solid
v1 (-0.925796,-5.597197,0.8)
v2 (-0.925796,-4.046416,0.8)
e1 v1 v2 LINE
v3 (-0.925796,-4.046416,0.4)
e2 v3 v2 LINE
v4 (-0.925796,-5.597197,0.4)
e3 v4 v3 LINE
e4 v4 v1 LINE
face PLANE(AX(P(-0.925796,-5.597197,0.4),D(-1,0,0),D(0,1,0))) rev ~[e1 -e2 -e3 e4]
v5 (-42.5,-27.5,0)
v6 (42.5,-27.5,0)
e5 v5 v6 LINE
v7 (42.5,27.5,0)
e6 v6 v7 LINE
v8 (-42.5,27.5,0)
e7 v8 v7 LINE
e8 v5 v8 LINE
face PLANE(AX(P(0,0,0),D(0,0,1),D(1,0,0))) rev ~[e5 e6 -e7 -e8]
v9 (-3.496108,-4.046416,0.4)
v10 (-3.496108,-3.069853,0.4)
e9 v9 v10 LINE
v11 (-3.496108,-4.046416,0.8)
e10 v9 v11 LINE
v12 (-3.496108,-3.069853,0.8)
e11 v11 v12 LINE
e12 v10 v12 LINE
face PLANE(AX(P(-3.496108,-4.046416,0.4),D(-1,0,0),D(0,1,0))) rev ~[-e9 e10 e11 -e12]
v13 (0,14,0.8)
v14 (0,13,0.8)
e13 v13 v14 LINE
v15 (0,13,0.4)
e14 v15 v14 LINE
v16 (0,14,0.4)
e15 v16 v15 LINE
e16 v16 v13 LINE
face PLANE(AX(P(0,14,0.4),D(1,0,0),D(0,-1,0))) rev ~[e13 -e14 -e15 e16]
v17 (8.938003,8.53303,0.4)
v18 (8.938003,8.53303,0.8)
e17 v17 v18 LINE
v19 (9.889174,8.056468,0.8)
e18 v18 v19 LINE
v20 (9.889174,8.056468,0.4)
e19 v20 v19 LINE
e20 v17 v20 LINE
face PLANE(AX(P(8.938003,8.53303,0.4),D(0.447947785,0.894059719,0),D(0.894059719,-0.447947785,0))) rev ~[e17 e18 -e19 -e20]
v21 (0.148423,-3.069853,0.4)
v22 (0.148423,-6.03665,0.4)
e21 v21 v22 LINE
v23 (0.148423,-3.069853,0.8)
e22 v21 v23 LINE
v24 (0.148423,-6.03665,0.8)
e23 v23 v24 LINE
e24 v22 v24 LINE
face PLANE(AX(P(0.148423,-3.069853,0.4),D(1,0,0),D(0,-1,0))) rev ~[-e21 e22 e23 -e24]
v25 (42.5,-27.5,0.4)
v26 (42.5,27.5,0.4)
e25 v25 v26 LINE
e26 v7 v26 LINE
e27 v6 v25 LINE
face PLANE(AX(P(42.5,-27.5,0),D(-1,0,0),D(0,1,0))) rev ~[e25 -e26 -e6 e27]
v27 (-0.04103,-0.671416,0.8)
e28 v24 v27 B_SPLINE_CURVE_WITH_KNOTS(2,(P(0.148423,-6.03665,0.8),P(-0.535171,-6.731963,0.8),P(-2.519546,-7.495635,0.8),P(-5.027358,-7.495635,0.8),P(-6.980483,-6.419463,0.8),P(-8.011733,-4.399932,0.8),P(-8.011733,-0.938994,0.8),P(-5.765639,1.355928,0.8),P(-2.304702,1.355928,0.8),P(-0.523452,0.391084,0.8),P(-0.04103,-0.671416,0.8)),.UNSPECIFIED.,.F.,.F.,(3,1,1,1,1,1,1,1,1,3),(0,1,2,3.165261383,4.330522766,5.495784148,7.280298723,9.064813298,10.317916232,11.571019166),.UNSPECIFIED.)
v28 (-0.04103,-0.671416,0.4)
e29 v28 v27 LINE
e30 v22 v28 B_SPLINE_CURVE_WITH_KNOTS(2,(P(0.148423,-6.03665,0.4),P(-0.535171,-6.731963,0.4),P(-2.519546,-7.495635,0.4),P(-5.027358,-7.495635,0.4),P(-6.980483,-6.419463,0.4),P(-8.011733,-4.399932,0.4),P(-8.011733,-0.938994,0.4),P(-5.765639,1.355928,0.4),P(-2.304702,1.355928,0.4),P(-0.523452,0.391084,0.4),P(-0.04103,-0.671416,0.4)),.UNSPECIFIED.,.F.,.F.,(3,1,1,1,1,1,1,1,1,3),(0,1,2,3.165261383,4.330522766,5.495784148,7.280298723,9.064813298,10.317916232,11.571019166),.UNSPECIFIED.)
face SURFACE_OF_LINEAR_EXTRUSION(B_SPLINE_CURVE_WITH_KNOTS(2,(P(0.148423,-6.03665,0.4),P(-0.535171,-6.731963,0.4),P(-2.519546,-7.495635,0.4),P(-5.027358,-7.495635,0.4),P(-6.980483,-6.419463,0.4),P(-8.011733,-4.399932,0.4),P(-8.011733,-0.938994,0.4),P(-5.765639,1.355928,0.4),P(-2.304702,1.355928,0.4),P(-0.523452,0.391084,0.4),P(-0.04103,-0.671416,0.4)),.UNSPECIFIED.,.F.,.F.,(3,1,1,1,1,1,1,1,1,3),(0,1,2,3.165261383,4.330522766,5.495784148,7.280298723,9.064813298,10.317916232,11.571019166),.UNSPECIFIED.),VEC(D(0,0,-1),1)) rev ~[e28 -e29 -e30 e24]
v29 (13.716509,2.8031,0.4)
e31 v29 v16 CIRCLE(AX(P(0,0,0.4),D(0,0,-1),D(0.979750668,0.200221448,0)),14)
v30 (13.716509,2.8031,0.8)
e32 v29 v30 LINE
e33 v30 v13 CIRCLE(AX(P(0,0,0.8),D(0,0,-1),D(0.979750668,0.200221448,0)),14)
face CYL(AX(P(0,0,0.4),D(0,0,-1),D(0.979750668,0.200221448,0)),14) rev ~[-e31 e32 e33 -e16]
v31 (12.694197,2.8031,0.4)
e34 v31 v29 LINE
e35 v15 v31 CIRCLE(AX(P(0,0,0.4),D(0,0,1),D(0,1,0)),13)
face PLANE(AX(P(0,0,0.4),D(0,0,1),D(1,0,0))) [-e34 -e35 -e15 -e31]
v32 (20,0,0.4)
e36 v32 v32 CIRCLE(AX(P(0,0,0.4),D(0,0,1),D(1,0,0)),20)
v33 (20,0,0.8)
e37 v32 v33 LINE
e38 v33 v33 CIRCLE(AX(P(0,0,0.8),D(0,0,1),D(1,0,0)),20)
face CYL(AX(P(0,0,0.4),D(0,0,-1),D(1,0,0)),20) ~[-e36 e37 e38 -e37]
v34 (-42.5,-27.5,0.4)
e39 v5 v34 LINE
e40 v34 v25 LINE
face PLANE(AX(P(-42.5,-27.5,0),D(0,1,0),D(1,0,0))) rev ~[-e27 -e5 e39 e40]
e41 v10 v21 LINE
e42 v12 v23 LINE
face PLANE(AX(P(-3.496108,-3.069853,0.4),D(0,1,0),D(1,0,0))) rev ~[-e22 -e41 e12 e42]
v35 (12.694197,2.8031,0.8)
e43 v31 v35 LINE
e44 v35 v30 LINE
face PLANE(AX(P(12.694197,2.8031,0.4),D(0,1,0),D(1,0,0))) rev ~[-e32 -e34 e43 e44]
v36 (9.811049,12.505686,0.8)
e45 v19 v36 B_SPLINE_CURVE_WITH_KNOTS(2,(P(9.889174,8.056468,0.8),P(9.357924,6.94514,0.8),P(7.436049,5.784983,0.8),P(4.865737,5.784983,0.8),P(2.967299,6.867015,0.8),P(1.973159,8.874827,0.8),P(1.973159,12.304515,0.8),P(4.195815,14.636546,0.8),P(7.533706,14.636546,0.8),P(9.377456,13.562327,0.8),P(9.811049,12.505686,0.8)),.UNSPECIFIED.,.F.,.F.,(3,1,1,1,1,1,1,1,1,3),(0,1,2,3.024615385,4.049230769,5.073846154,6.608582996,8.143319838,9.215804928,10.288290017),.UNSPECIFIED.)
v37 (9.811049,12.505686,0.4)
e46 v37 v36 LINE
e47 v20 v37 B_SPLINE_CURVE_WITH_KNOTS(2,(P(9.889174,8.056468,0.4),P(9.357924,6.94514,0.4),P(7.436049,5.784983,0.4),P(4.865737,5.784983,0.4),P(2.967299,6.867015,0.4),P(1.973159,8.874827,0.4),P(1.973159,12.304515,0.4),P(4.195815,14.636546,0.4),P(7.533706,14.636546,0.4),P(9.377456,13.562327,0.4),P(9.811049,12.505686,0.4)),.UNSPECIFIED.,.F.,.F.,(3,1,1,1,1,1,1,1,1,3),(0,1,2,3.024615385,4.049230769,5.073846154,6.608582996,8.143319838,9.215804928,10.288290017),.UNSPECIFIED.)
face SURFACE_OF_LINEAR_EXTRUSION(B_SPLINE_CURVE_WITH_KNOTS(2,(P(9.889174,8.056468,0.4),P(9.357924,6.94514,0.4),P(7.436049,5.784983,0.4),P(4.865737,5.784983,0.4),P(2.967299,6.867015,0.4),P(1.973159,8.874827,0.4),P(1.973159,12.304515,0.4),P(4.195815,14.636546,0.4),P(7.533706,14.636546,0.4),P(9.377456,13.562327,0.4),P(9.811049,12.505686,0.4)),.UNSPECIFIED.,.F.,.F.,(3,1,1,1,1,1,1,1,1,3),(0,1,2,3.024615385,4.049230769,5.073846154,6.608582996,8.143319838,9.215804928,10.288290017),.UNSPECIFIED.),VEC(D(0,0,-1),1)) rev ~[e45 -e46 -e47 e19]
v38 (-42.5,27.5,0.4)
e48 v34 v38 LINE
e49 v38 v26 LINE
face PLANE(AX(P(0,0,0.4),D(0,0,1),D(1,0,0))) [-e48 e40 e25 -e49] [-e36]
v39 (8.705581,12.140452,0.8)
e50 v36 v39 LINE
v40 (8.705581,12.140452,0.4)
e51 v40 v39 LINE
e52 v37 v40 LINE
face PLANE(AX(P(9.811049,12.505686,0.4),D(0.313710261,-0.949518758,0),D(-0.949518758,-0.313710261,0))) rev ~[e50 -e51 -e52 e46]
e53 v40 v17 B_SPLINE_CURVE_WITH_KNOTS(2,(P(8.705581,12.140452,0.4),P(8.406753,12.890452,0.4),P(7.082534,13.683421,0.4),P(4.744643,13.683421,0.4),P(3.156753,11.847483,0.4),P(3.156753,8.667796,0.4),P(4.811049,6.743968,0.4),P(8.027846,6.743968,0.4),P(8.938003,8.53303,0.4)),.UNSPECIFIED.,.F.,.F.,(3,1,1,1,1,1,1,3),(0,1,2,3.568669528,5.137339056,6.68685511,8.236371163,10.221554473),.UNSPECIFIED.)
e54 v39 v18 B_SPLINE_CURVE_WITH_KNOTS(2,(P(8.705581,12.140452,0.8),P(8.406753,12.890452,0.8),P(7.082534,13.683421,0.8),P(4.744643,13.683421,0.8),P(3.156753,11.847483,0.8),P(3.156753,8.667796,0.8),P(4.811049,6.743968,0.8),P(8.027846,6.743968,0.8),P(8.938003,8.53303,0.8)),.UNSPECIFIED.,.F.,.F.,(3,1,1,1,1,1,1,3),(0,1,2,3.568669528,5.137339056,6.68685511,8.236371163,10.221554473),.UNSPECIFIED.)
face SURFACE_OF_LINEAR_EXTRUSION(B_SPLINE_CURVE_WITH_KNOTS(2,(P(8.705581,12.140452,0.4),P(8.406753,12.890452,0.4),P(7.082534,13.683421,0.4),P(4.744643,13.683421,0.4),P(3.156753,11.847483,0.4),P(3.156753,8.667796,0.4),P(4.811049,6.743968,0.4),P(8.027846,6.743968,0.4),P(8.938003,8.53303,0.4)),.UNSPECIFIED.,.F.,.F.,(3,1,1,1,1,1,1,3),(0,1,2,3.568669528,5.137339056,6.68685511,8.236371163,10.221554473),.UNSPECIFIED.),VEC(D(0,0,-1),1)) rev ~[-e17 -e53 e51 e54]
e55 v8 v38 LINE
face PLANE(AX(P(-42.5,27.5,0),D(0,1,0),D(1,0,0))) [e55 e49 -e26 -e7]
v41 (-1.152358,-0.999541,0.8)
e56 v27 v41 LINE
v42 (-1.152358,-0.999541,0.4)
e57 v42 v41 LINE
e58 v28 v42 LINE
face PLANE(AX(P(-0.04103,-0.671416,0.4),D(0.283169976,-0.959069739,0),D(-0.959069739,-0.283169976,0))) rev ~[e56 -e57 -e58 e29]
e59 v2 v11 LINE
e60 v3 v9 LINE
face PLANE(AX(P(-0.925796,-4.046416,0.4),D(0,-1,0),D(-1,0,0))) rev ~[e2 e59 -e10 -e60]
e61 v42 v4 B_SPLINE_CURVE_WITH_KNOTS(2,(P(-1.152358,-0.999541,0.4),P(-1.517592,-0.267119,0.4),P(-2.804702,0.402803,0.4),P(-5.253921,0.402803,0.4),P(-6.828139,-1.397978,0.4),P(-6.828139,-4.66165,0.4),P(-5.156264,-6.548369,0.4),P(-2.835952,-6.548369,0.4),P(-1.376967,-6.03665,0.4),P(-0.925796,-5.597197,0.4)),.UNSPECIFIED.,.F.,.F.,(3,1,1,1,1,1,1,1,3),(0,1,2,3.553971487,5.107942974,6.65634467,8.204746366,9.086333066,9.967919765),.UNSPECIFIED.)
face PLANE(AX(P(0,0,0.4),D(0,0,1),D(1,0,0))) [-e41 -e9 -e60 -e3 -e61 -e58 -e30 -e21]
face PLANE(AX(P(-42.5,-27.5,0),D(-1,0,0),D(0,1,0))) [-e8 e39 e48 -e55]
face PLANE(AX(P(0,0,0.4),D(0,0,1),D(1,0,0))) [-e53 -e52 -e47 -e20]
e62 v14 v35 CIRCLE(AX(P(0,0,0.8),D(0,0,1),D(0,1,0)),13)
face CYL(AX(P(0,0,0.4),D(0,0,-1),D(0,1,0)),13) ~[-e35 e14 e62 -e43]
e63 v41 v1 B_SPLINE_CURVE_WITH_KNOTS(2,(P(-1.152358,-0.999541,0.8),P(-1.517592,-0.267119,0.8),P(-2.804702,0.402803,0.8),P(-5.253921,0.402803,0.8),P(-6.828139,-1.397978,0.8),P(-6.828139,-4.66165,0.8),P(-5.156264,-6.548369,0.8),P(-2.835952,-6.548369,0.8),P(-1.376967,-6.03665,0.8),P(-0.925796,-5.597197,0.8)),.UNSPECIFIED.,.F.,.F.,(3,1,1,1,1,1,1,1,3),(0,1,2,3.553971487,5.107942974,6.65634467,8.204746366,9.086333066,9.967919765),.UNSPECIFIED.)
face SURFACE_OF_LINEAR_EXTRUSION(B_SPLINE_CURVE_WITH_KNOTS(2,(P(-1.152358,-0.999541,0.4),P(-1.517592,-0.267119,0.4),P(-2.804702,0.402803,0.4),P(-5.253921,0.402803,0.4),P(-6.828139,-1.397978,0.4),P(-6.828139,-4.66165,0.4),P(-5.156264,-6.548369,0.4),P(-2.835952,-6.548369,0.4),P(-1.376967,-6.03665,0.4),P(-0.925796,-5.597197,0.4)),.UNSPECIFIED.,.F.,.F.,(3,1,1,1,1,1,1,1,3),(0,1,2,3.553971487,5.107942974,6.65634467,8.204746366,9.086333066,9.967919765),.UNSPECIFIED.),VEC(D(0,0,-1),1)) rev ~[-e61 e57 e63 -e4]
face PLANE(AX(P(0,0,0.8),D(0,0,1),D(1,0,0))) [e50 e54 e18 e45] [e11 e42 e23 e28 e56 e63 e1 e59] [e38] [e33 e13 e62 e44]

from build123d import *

# Parameters (mm, degrees)
F0_W     = 85
F0_H     = 55
F1_DEPTH = 0.4
F2_R     = 20
F3_DEPTH = 0.4


with BuildPart() as f1:
    # F0 (on Top) → F1 (new body)
    with BuildSketch(Plane.XY):
        Rectangle(F0_W, F0_H)
    extrude(amount=F1_DEPTH)

    # F2 (on face) → F3 (join)
    with BuildSketch(Plane.XY.offset(0.4)):
        Circle(F2_R)
        with BuildLine():
            add(Edge.make_bspline(
                [(-7.4961080118, -5.409697216), (-8.0117330118, -4.399931591), (-8.0117330118, -3.032744091)],
                knots=[0, 0, 0, 1, 1, 1], degree=2))
            add(Edge.make_bspline(
                [(-8.0117330118, -3.032744091), (-8.0117330118, -0.938994091), (-6.8886861368, 0.2084668465)],
                knots=[0, 0, 0, 1, 1, 1], degree=2))
            add(Edge.make_bspline(
                [(-6.8886861368, 0.2084668465), (-5.7656392618, 1.355927784), (-3.7324361368, 1.355927784)],
                knots=[0, 0, 0, 1, 1, 1], degree=2))
            add(Edge.make_bspline(
                [(-3.7324361368, 1.355927784), (-2.3047017618, 1.355927784), (-1.4140767618, 0.873505909)],
                knots=[0, 0, 0, 1, 1, 1], degree=2))
            add(Edge.make_bspline(
                [(-1.4140767618, 0.873505909), (-0.5234517618, 0.391084034), (-0.0410298868, -0.671415966)],
                knots=[0, 0, 0, 1, 1, 1], degree=2))
            Line((-0.0410298868, -0.671415966), (-1.1523580118, -0.999540966))
            add(Edge.make_bspline(
                [(-1.1523580118, -0.999540966), (-1.5175923868, -0.267119091), (-2.1611470743, 0.0678418465)],
                knots=[0, 0, 0, 1, 1, 1], degree=2))
            add(Edge.make_bspline(
                [(-2.1611470743, 0.0678418465), (-2.8047017618, 0.402802784), (-3.7636861368, 0.402802784)],
                knots=[0, 0, 0, 1, 1, 1], degree=2))
            add(Edge.make_bspline(
                [(-3.7636861368, 0.402802784), (-5.2539205118, 0.402802784), (-6.0410298868, -0.497587841)],
                knots=[0, 0, 0, 1, 1, 1], degree=2))
            add(Edge.make_bspline(
                [(-6.0410298868, -0.497587841), (-6.8281392618, -1.397978466), (-6.8281392618, -3.032744091)],
                knots=[0, 0, 0, 1, 1, 1], degree=2))
            add(Edge.make_bspline(
                [(-6.8281392618, -3.032744091), (-6.8281392618, -4.661650341), (-5.9922017618, -5.605009716)],
                knots=[0, 0, 0, 1, 1, 1], degree=2))
            add(Edge.make_bspline(
                [(-5.9922017618, -5.605009716), (-5.1562642618, -6.548369091), (-3.6777486368, -6.548369091)],
                knots=[0, 0, 0, 1, 1, 1], degree=2))
            add(Edge.make_bspline(
                [(-3.6777486368, -6.548369091), (-2.8359517618, -6.548369091), (-2.1064595743, -6.292509716)],
                knots=[0, 0, 0, 1, 1, 1], degree=2))
            add(Edge.make_bspline(
                [(-2.1064595743, -6.292509716), (-1.3769673868, -6.036650341), (-0.9257955118, -5.597197216)],
                knots=[0, 0, 0, 1, 1, 1], degree=2))
            Line((-0.9257955118, -5.597197216), (-0.9257955118, -4.046415966))
            Line((-0.9257955118, -4.046415966), (-3.4961080118, -4.046415966))
            Line((-3.4961080118, -4.046415966), (-3.4961080118, -3.069853466))
            Line((-3.4961080118, -3.069853466), (0.1484232382, -3.069853466))
            Line((0.1484232382, -3.069853466), (0.1484232382, -6.036650341))
            add(Edge.make_bspline(
                [(0.1484232382, -6.036650341), (-0.5351705118, -6.731962841), (-1.5273580118, -7.1137987785)],
                knots=[0, 0, 0, 1, 1, 1], degree=2))
            add(Edge.make_bspline(
                [(-1.5273580118, -7.1137987785), (-2.5195455118, -7.495634716), (-3.6777486368, -7.495634716)],
                knots=[0, 0, 0, 1, 1, 1], degree=2))
            add(Edge.make_bspline(
                [(-3.6777486368, -7.495634716), (-5.0273580118, -7.495634716), (-6.0039205118, -6.9575487785)],
                knots=[0, 0, 0, 1, 1, 1], degree=2))
            add(Edge.make_bspline(
                [(-6.0039205118, -6.9575487785), (-6.9804830118, -6.419462841), (-7.4961080118, -5.409697216)],
                knots=[0, 0, 0, 1, 1, 1], degree=2))
        make_face(mode=Mode.SUBTRACT)
        with BuildLine():
            ThreePointArc((13.716509354, 2.803100273), (-8.8531518731, -10.845353932), (0, 14))
            Line((0, 14), (0, 13))
            ThreePointArc((0, 13), (-8.1412436535, -10.135095055), (12.6941966607, 2.803100273))
            Line((12.6941966607, 2.803100273), (13.716509354, 2.803100273))
        make_face(mode=Mode.SUBTRACT)
        with BuildLine():
            add(Edge.make_bspline(
                [(7.744643158, 13.2869364135), (7.082533783, 13.6834207885), (6.172377533, 13.6834207885)],
                knots=[0, 0, 0, 1, 1, 1], degree=2))
            add(Edge.make_bspline(
                [(6.172377533, 13.6834207885), (4.744643158, 13.6834207885), (3.9506978455, 12.7654520385)],
                knots=[0, 0, 0, 1, 1, 1], degree=2))
            add(Edge.make_bspline(
                [(3.9506978455, 12.7654520385), (3.156752533, 11.8474832885), (3.156752533, 10.2478739135)],
                knots=[0, 0, 0, 1, 1, 1], degree=2))
            add(Edge.make_bspline(
                [(3.156752533, 10.2478739135), (3.156752533, 8.6677957885), (3.9839009705, 7.705881726)],
                knots=[0, 0, 0, 1, 1, 1], degree=2))
            add(Edge.make_bspline(
                [(3.9839009705, 7.705881726), (4.811049408, 6.7439676635), (6.221205658, 6.7439676635)],
                knots=[0, 0, 0, 1, 1, 1], degree=2))
            add(Edge.make_bspline(
                [(6.221205658, 6.7439676635), (8.027846283, 6.7439676635), (8.938002533, 8.5330301635)],
                knots=[0, 0, 0, 1, 1, 1], degree=2))
            Line((8.938002533, 8.5330301635), (9.889174408, 8.0564676635))
            add(Edge.make_bspline(
                [(9.889174408, 8.0564676635), (9.357924408, 6.9451395385), (8.396986908, 6.3650614135)],
                knots=[0, 0, 0, 1, 1, 1], degree=2))
            add(Edge.make_bspline(
                [(8.396986908, 6.3650614135), (7.436049408, 5.7849832885), (6.166518158, 5.7849832885)],
                knots=[0, 0, 0, 1, 1, 1], degree=2))
            add(Edge.make_bspline(
                [(6.166518158, 5.7849832885), (4.865736908, 5.7849832885), (3.916518158, 6.3259989135)],
                knots=[0, 0, 0, 1, 1, 1], degree=2))
            add(Edge.make_bspline(
                [(3.916518158, 6.3259989135), (2.967299408, 6.8670145385), (2.4702290955, 7.8709207885)],
                knots=[0, 0, 0, 1, 1, 1], degree=2))
            add(Edge.make_bspline(
                [(2.4702290955, 7.8709207885), (1.973158783, 8.8748270385), (1.973158783, 10.2478739135)],
                knots=[0, 0, 0, 1, 1, 1], degree=2))
            add(Edge.make_bspline(
                [(1.973158783, 10.2478739135), (1.973158783, 12.3045145385), (3.084486908, 13.4705301635)],
                knots=[0, 0, 0, 1, 1, 1], degree=2))
            add(Edge.make_bspline(
                [(3.084486908, 13.4705301635), (4.195815033, 14.6365457885), (6.160658783, 14.6365457885)],
                knots=[0, 0, 0, 1, 1, 1], degree=2))
            add(Edge.make_bspline(
                [(6.160658783, 14.6365457885), (7.533705658, 14.6365457885), (8.455580658, 14.0994364135)],
                knots=[0, 0, 0, 1, 1, 1], degree=2))
            add(Edge.make_bspline(
                [(8.455580658, 14.0994364135), (9.377455658, 13.5623270385), (9.811049408, 12.5056864135)],
                knots=[0, 0, 0, 1, 1, 1], degree=2))
            Line((9.811049408, 12.5056864135), (8.705580658, 12.1404520385))
            add(Edge.make_bspline(
                [(8.705580658, 12.1404520385), (8.406752533, 12.8904520385), (7.744643158, 13.2869364135)],
                knots=[0, 0, 0, 1, 1, 1], degree=2))
        make_face(mode=Mode.SUBTRACT)
    extrude(amount=F3_DEPTH)


solid = f1.part
